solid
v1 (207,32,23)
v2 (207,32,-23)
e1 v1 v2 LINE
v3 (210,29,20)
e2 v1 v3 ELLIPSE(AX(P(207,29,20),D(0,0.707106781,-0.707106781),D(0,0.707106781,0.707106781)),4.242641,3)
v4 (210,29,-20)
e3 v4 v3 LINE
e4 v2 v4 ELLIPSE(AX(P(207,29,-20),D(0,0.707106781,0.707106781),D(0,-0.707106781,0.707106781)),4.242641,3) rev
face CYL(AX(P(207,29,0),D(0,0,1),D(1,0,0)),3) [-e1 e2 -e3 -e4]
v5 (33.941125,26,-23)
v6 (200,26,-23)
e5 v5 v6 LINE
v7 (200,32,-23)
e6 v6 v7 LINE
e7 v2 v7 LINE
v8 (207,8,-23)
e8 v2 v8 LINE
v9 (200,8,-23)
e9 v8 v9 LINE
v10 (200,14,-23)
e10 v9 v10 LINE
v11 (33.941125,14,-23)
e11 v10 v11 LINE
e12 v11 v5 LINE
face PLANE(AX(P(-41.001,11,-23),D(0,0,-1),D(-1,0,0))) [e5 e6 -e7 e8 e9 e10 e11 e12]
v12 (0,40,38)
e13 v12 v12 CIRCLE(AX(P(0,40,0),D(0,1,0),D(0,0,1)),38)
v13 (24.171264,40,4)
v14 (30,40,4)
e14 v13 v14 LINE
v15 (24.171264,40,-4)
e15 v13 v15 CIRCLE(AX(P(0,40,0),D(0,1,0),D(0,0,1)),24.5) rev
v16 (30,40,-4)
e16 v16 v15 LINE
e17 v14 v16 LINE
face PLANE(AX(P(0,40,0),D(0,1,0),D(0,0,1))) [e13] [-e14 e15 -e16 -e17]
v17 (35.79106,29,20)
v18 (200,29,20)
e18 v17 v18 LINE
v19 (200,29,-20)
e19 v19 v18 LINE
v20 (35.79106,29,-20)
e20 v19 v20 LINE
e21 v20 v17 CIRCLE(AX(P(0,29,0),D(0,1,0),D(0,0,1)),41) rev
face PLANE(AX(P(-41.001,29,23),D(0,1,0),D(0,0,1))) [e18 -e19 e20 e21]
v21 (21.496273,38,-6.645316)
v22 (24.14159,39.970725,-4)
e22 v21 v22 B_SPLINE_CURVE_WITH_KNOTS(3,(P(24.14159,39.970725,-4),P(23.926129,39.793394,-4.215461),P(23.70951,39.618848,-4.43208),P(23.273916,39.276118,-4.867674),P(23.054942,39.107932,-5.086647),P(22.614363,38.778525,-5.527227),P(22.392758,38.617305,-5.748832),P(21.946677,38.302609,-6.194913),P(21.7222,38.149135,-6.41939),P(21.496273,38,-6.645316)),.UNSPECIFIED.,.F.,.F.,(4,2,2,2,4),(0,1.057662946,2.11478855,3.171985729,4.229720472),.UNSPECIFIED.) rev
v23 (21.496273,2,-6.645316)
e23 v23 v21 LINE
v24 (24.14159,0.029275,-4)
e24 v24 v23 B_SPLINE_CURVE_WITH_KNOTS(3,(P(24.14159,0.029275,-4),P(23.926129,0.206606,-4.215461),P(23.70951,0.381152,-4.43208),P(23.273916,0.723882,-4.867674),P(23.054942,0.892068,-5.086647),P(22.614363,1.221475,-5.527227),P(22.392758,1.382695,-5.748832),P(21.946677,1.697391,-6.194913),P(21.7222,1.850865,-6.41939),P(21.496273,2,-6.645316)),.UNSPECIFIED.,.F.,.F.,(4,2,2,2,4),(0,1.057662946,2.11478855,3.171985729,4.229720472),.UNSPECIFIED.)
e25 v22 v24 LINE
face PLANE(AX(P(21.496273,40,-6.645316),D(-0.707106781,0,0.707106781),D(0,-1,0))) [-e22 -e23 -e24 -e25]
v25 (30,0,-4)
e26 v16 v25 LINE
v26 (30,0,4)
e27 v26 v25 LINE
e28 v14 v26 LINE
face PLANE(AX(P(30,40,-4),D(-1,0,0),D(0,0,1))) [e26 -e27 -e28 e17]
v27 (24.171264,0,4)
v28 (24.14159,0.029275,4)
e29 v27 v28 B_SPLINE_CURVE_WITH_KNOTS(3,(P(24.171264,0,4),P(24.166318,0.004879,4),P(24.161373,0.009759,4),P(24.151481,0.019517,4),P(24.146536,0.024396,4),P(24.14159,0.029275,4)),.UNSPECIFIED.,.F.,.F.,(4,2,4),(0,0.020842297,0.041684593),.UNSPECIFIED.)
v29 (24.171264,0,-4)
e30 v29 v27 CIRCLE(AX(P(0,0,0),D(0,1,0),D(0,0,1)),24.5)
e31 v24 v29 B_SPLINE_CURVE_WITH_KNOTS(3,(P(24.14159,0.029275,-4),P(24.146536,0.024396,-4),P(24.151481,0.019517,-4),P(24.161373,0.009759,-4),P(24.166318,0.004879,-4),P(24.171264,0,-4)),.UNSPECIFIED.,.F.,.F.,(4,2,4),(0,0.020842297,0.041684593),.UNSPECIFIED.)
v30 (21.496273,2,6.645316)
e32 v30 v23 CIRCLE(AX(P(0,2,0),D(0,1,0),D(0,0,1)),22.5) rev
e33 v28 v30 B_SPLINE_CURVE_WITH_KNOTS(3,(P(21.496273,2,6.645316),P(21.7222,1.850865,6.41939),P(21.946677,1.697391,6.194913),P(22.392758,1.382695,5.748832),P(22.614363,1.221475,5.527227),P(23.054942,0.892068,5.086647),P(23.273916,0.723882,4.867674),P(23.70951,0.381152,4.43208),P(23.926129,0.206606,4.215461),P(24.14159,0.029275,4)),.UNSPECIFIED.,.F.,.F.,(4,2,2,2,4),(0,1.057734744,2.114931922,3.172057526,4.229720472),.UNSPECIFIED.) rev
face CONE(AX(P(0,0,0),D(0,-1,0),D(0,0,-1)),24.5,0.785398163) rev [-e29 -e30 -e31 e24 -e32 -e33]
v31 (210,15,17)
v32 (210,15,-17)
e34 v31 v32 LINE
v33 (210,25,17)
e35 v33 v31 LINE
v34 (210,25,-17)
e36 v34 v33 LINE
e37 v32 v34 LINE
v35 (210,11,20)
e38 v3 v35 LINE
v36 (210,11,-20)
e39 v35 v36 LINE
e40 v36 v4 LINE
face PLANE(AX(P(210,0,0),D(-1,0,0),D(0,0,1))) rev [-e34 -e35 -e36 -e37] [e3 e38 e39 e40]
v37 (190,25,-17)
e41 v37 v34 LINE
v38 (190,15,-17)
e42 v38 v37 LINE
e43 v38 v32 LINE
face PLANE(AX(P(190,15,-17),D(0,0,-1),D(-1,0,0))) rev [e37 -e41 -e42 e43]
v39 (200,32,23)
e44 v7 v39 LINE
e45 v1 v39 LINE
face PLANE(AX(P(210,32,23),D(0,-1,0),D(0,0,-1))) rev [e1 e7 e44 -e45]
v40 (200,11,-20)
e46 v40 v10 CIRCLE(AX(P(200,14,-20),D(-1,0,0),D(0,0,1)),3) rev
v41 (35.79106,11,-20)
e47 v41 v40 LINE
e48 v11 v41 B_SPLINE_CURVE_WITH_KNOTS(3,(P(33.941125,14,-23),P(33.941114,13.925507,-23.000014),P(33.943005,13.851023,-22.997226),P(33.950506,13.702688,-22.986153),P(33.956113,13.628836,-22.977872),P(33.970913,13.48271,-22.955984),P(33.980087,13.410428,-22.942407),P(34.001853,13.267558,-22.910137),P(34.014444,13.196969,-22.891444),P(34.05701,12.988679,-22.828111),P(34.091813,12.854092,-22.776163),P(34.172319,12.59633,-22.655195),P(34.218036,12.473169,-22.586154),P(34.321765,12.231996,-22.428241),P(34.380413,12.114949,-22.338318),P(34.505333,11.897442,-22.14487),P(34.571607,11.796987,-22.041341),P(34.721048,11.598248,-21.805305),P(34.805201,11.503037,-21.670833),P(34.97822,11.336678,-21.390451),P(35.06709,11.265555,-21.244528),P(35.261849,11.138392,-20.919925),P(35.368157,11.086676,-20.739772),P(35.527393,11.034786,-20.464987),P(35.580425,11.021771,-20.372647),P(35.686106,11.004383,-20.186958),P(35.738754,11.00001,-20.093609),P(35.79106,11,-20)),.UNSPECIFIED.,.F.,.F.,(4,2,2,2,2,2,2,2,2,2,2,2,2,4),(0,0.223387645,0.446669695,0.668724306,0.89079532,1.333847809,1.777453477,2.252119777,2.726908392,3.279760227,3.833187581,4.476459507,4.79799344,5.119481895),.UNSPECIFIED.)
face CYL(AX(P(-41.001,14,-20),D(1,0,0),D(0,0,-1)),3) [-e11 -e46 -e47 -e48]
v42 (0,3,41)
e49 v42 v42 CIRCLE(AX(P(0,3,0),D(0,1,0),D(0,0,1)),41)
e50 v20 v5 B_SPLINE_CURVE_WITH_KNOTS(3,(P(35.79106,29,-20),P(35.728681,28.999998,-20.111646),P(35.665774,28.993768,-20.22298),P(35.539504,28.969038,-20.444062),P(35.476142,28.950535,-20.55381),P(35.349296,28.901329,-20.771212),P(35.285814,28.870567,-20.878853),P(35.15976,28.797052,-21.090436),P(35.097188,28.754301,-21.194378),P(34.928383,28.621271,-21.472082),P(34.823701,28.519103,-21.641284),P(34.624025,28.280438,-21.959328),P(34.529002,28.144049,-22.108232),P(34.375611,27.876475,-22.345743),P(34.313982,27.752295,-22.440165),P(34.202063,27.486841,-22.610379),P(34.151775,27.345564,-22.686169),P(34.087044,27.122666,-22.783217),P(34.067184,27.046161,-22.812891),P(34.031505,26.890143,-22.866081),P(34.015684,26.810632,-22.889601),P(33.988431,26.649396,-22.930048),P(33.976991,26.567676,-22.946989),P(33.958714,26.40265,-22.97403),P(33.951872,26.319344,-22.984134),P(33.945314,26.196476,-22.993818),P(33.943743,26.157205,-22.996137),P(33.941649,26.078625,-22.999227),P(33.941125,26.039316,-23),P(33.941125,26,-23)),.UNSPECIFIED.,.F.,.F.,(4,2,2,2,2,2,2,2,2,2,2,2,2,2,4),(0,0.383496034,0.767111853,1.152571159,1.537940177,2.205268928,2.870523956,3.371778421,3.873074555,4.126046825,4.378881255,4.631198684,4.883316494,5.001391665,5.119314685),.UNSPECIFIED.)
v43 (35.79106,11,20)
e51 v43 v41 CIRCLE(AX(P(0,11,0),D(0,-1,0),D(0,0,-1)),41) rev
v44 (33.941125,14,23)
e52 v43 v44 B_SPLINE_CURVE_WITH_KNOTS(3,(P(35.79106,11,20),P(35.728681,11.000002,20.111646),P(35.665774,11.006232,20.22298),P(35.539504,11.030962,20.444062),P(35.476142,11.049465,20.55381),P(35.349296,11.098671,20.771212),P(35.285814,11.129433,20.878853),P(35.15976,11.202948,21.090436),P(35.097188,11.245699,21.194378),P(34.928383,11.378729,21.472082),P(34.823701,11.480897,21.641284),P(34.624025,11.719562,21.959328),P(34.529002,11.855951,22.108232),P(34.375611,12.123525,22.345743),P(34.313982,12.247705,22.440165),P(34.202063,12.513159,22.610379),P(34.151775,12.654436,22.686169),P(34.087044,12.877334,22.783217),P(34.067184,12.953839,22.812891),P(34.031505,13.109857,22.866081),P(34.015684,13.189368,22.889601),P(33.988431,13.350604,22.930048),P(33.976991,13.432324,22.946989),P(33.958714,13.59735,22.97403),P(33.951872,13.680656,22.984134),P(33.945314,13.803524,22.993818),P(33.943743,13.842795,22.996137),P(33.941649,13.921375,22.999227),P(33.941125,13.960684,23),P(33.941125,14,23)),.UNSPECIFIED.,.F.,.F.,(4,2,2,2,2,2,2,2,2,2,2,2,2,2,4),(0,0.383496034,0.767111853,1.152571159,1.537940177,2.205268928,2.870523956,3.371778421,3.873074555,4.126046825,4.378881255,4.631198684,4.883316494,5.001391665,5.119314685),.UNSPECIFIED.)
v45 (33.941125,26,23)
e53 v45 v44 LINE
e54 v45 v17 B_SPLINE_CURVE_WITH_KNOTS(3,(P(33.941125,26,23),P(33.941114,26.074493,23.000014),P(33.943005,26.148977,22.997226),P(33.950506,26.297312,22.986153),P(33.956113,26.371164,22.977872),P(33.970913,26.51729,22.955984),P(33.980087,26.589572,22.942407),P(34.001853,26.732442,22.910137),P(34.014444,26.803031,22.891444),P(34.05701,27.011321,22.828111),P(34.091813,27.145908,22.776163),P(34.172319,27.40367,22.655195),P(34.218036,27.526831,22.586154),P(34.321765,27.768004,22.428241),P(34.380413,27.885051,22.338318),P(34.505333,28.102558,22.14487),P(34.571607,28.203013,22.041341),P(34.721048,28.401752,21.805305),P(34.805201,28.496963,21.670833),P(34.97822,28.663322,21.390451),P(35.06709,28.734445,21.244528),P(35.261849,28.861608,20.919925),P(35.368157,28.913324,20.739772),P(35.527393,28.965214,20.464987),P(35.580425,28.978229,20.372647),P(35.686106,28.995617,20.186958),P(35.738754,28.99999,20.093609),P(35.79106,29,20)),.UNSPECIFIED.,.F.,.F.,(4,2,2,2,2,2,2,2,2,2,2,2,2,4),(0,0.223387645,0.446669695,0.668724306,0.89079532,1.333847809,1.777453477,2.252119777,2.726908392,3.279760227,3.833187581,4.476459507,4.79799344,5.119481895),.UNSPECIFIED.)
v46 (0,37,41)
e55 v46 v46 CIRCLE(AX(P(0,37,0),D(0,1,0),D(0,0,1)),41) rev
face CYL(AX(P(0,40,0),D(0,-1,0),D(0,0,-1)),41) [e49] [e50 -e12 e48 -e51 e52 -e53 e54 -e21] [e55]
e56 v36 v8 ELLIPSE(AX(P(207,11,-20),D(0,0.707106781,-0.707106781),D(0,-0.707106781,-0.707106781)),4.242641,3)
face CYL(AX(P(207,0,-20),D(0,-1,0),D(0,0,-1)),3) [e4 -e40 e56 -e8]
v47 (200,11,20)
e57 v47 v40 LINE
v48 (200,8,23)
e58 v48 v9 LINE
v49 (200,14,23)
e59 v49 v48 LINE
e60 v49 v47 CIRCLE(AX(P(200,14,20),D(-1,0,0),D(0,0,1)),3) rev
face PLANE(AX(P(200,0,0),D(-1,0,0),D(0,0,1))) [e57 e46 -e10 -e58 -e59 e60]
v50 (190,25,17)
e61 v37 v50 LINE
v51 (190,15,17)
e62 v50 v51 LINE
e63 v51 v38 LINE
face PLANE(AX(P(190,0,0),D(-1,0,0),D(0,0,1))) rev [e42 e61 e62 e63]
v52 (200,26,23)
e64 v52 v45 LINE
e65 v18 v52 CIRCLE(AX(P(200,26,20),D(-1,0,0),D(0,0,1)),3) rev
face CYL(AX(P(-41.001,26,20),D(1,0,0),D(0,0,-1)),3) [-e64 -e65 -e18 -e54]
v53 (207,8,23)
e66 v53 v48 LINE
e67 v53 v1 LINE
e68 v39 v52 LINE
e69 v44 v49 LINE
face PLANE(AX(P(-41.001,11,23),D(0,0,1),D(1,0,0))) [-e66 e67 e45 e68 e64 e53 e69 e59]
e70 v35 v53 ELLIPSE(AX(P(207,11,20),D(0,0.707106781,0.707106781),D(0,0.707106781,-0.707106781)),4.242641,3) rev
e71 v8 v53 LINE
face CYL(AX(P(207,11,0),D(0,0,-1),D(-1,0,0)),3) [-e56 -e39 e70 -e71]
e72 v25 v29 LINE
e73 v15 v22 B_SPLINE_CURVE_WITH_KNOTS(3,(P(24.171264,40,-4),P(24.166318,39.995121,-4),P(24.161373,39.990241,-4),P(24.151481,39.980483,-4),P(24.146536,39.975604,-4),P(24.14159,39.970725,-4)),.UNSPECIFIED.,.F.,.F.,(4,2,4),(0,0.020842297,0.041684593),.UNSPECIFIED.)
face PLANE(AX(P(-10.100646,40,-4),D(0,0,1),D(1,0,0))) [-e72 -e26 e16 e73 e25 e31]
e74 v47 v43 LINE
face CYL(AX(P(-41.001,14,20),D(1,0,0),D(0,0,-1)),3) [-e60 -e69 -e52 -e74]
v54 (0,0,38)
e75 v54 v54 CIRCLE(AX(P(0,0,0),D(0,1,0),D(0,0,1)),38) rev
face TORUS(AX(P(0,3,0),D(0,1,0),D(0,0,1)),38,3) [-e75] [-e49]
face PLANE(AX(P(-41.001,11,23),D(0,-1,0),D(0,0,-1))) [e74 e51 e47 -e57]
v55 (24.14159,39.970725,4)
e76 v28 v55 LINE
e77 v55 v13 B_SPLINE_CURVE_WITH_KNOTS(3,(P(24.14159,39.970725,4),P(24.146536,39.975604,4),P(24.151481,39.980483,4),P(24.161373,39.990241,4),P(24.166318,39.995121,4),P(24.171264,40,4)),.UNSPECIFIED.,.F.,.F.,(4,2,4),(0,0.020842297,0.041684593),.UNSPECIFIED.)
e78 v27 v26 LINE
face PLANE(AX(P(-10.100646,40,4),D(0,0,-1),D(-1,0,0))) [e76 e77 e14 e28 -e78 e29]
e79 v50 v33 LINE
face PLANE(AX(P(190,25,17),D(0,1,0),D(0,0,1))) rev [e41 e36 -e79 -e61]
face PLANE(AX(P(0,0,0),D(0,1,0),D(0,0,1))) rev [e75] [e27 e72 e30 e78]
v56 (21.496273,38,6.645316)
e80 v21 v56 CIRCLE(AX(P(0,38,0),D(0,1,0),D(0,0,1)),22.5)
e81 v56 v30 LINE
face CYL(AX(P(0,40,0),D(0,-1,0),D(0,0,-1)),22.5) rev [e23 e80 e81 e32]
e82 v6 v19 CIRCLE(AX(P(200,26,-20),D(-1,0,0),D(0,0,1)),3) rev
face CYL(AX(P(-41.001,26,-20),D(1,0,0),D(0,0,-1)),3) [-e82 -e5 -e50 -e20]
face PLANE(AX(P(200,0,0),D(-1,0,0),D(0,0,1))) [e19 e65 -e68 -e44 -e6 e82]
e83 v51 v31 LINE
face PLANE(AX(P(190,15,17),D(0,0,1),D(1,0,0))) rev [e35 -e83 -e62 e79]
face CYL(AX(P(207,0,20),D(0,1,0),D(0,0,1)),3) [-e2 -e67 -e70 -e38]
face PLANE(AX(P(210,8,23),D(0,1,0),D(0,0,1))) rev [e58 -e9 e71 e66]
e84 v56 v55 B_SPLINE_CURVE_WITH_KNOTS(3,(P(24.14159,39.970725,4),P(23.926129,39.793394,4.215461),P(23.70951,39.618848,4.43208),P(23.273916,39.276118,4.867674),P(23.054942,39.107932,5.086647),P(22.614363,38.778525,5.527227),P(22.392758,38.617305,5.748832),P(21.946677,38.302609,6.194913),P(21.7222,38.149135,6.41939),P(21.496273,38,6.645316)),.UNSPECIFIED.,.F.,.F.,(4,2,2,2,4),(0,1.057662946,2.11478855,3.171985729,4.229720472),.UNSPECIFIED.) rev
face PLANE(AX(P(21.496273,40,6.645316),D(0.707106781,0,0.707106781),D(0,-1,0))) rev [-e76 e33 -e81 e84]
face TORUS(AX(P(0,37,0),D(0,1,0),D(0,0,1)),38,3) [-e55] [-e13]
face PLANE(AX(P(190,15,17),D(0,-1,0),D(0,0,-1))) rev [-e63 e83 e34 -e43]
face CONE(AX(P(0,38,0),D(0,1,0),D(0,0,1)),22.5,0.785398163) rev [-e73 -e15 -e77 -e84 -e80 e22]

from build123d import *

# Parameters (mm, degrees)
SKETCH_1_R           = 41
SKETCH_1_R_2         = 22.5
EXTRUDE_1_DEPTH      = 40
SKETCH_2_W           = 46
SKETCH_2_H           = 24
EXTRUDE_2_DEPTH      = 10
EXTRUDE_3_REACH      = 249.714
EXTRUDE_3_END_RADIUS = 41
SKETCH_3_W           = 46
SKETCH_3_H           = 18
SKETCH_4_W           = 40.100646326
SKETCH_4_H           = 8
CUT_EXTRUDE_1_DEPTH  = 218.671771252
SKETCH_5_W           = 34
SKETCH_5_H           = 10
CUT_EXTRUDE_2_DEPTH  = 10
FILLET_1_R           = 3
CHAMFER_1_SIZE       = 2


with BuildPart() as part:
    # 草图1 → 凸台-拉伸1 (new body)
    with BuildSketch(Plane(origin=(0, 0, 0), x_dir=(1, 0, 0), z_dir=(0, 1, 0))):
        with Locations(Location((0, 0, 0), (0, 0, 270))):
            Circle(SKETCH_1_R)
        with Locations(Location((0, 0, 0), (0, 0, 270))):
            Circle(SKETCH_1_R_2, mode=Mode.SUBTRACT)
    extrude(amount=EXTRUDE_1_DEPTH)



with BuildPart() as body_2:
    # 草图2 → 凸台-拉伸2 (new body)
    with BuildSketch(Plane(origin=(200, 0, 0), x_dir=(0, 0, -1), z_dir=(1, 0, 0))):
        with Locations((0, 20)):
            Rectangle(SKETCH_2_W, SKETCH_2_H)
    extrude(amount=EXTRUDE_2_DEPTH)


with BuildPart() as part_1:
    add(part.part)

    add(body_2.part)  # 凸台-拉伸3 merges body 2
    # 凸台-拉伸3: up to this cylinder (the profile starts outside it)
    extrude_3_end = Plane(origin=(0, 20, 0), z_dir=(0, -1, 0)) * Cylinder(EXTRUDE_3_END_RADIUS, 582.428, mode=Mode.PRIVATE)
    # 草图3 → 凸台-拉伸3 (add, up to the surface)
    with BuildSketch(Plane(origin=(200, 0, 0), x_dir=(0, 0, -1), z_dir=(1, 0, 0)), mode=Mode.PRIVATE) as extrude_3_sk1:
        with Locations((0, 20)):
            Rectangle(SKETCH_3_W, SKETCH_3_H)
    extrude_3_tool1 = extrude(extrude_3_sk1.sketch, amount=-EXTRUDE_3_REACH, mode=Mode.PRIVATE) - extrude_3_end
    add(extrude_3_tool1.solids().sort_by_distance((200, 20, 0))[0])

    # 草图4 → 切除-拉伸1 (cut, through all)
    with BuildSketch(Plane(origin=(0, 0, 0), x_dir=(1, 0, 0), z_dir=(0, 1, 0))):
        with Locations((9.949676837, 0)):
            Rectangle(SKETCH_4_W, SKETCH_4_H)
    extrude(amount=CUT_EXTRUDE_1_DEPTH, mode=Mode.SUBTRACT)

    # 草图5 → 切除-拉伸2 (cut, symmetric)
    with BuildSketch(Plane(origin=(200, 0, 0), x_dir=(0, 0, -1), z_dir=(1, 0, 0))):
        with Locations((0, 20)):
            Rectangle(SKETCH_5_W, SKETCH_5_H)
    extrude(amount=CUT_EXTRUDE_2_DEPTH, both=True, mode=Mode.SUBTRACT)

    # 圆角1
    fillet_1_edges = [part_1.edges().sort_by_distance(p)[0] for p in [
        (116.970562748, 29, 23),
        (116.970562748, 11, 23),
        (116.970562748, 11, -23),
        (116.970562748, 29, -23),
        (0, 0, -41),
        (210, 20, -23),
        (210, 32, 0),
        (210, 20, 23),
        (210, 8, 0),
        (0, 40, -41),
    ]]
    fillet(fillet_1_edges, radius=FILLET_1_R)

    # 倒角1
    # the kernel refuses this chamfer: 2.480488228, 2 mm, written as the material it takes off along each edge
    with BuildSketch(Plane(origin=(22.141589825, 47.02037687, 4), x_dir=(1, 0, 0), z_dir=(0, -1, 0))) as chamfer_1_piece_1:
        with BuildLine():
            Line((CHAMFER_1_SIZE, 0), (-0.645316442, 2.645316442))
            ThreePointArc((-0.645316442, 2.645316442), (-0.292721572, 1.373728317), (0, 0))
            Line((0, 0), (CHAMFER_1_SIZE, 0))
        make_face()
    extrude(amount=54.040753739, mode=Mode.SUBTRACT)
    with BuildSketch(Plane(origin=(22.141589825, 47.02037687, -4), x_dir=(1, 0, 0), z_dir=(0, -1, 0))) as chamfer_1_piece_2:
        with BuildLine():
            Line((CHAMFER_1_SIZE, 0), (-0.645316442, -2.645316442))
            ThreePointArc((-0.645316442, -2.645316442), (-0.292721572, -1.373728317), (0, 0))
            Line((0, 0), (CHAMFER_1_SIZE, 0))
        make_face()
    extrude(amount=54.040753739, mode=Mode.SUBTRACT)
    # the kernel refuses this chamfer: 2.480488228, 2 mm, written as the material it takes off along each edge
    with BuildSketch(Plane(origin=(0, 40, 0), x_dir=(0.9975496866331381, 0, 0.06996158015745366), z_dir=(0.06996158015745366, 0, -0.9975496866331381))) as chamfer_1_2_piece_1:
        Polygon((22.5 + CHAMFER_1_SIZE, 0), (22.5, CHAMFER_1_SIZE), (22.5, 0), align=None)
    revolve(axis=Axis((0, 40, 0), (0, -1, 0)), revolution_arc=351.976438974, mode=Mode.SUBTRACT)
    with BuildSketch(Plane(origin=(0, 0, 0), x_dir=(0.9975496866331381, 0, -0.06996158015745378), z_dir=(0.06996158015745378, 0, 0.9975496866331381))) as chamfer_1_2_piece_2:
        Polygon((22.5 + CHAMFER_1_SIZE, 0), (22.5, CHAMFER_1_SIZE), (22.5, 0), align=None)
    revolve(axis=Axis((0, 0, 0), (0, 1, 0)), revolution_arc=351.976438974, mode=Mode.SUBTRACT)


solid = part_1.part
